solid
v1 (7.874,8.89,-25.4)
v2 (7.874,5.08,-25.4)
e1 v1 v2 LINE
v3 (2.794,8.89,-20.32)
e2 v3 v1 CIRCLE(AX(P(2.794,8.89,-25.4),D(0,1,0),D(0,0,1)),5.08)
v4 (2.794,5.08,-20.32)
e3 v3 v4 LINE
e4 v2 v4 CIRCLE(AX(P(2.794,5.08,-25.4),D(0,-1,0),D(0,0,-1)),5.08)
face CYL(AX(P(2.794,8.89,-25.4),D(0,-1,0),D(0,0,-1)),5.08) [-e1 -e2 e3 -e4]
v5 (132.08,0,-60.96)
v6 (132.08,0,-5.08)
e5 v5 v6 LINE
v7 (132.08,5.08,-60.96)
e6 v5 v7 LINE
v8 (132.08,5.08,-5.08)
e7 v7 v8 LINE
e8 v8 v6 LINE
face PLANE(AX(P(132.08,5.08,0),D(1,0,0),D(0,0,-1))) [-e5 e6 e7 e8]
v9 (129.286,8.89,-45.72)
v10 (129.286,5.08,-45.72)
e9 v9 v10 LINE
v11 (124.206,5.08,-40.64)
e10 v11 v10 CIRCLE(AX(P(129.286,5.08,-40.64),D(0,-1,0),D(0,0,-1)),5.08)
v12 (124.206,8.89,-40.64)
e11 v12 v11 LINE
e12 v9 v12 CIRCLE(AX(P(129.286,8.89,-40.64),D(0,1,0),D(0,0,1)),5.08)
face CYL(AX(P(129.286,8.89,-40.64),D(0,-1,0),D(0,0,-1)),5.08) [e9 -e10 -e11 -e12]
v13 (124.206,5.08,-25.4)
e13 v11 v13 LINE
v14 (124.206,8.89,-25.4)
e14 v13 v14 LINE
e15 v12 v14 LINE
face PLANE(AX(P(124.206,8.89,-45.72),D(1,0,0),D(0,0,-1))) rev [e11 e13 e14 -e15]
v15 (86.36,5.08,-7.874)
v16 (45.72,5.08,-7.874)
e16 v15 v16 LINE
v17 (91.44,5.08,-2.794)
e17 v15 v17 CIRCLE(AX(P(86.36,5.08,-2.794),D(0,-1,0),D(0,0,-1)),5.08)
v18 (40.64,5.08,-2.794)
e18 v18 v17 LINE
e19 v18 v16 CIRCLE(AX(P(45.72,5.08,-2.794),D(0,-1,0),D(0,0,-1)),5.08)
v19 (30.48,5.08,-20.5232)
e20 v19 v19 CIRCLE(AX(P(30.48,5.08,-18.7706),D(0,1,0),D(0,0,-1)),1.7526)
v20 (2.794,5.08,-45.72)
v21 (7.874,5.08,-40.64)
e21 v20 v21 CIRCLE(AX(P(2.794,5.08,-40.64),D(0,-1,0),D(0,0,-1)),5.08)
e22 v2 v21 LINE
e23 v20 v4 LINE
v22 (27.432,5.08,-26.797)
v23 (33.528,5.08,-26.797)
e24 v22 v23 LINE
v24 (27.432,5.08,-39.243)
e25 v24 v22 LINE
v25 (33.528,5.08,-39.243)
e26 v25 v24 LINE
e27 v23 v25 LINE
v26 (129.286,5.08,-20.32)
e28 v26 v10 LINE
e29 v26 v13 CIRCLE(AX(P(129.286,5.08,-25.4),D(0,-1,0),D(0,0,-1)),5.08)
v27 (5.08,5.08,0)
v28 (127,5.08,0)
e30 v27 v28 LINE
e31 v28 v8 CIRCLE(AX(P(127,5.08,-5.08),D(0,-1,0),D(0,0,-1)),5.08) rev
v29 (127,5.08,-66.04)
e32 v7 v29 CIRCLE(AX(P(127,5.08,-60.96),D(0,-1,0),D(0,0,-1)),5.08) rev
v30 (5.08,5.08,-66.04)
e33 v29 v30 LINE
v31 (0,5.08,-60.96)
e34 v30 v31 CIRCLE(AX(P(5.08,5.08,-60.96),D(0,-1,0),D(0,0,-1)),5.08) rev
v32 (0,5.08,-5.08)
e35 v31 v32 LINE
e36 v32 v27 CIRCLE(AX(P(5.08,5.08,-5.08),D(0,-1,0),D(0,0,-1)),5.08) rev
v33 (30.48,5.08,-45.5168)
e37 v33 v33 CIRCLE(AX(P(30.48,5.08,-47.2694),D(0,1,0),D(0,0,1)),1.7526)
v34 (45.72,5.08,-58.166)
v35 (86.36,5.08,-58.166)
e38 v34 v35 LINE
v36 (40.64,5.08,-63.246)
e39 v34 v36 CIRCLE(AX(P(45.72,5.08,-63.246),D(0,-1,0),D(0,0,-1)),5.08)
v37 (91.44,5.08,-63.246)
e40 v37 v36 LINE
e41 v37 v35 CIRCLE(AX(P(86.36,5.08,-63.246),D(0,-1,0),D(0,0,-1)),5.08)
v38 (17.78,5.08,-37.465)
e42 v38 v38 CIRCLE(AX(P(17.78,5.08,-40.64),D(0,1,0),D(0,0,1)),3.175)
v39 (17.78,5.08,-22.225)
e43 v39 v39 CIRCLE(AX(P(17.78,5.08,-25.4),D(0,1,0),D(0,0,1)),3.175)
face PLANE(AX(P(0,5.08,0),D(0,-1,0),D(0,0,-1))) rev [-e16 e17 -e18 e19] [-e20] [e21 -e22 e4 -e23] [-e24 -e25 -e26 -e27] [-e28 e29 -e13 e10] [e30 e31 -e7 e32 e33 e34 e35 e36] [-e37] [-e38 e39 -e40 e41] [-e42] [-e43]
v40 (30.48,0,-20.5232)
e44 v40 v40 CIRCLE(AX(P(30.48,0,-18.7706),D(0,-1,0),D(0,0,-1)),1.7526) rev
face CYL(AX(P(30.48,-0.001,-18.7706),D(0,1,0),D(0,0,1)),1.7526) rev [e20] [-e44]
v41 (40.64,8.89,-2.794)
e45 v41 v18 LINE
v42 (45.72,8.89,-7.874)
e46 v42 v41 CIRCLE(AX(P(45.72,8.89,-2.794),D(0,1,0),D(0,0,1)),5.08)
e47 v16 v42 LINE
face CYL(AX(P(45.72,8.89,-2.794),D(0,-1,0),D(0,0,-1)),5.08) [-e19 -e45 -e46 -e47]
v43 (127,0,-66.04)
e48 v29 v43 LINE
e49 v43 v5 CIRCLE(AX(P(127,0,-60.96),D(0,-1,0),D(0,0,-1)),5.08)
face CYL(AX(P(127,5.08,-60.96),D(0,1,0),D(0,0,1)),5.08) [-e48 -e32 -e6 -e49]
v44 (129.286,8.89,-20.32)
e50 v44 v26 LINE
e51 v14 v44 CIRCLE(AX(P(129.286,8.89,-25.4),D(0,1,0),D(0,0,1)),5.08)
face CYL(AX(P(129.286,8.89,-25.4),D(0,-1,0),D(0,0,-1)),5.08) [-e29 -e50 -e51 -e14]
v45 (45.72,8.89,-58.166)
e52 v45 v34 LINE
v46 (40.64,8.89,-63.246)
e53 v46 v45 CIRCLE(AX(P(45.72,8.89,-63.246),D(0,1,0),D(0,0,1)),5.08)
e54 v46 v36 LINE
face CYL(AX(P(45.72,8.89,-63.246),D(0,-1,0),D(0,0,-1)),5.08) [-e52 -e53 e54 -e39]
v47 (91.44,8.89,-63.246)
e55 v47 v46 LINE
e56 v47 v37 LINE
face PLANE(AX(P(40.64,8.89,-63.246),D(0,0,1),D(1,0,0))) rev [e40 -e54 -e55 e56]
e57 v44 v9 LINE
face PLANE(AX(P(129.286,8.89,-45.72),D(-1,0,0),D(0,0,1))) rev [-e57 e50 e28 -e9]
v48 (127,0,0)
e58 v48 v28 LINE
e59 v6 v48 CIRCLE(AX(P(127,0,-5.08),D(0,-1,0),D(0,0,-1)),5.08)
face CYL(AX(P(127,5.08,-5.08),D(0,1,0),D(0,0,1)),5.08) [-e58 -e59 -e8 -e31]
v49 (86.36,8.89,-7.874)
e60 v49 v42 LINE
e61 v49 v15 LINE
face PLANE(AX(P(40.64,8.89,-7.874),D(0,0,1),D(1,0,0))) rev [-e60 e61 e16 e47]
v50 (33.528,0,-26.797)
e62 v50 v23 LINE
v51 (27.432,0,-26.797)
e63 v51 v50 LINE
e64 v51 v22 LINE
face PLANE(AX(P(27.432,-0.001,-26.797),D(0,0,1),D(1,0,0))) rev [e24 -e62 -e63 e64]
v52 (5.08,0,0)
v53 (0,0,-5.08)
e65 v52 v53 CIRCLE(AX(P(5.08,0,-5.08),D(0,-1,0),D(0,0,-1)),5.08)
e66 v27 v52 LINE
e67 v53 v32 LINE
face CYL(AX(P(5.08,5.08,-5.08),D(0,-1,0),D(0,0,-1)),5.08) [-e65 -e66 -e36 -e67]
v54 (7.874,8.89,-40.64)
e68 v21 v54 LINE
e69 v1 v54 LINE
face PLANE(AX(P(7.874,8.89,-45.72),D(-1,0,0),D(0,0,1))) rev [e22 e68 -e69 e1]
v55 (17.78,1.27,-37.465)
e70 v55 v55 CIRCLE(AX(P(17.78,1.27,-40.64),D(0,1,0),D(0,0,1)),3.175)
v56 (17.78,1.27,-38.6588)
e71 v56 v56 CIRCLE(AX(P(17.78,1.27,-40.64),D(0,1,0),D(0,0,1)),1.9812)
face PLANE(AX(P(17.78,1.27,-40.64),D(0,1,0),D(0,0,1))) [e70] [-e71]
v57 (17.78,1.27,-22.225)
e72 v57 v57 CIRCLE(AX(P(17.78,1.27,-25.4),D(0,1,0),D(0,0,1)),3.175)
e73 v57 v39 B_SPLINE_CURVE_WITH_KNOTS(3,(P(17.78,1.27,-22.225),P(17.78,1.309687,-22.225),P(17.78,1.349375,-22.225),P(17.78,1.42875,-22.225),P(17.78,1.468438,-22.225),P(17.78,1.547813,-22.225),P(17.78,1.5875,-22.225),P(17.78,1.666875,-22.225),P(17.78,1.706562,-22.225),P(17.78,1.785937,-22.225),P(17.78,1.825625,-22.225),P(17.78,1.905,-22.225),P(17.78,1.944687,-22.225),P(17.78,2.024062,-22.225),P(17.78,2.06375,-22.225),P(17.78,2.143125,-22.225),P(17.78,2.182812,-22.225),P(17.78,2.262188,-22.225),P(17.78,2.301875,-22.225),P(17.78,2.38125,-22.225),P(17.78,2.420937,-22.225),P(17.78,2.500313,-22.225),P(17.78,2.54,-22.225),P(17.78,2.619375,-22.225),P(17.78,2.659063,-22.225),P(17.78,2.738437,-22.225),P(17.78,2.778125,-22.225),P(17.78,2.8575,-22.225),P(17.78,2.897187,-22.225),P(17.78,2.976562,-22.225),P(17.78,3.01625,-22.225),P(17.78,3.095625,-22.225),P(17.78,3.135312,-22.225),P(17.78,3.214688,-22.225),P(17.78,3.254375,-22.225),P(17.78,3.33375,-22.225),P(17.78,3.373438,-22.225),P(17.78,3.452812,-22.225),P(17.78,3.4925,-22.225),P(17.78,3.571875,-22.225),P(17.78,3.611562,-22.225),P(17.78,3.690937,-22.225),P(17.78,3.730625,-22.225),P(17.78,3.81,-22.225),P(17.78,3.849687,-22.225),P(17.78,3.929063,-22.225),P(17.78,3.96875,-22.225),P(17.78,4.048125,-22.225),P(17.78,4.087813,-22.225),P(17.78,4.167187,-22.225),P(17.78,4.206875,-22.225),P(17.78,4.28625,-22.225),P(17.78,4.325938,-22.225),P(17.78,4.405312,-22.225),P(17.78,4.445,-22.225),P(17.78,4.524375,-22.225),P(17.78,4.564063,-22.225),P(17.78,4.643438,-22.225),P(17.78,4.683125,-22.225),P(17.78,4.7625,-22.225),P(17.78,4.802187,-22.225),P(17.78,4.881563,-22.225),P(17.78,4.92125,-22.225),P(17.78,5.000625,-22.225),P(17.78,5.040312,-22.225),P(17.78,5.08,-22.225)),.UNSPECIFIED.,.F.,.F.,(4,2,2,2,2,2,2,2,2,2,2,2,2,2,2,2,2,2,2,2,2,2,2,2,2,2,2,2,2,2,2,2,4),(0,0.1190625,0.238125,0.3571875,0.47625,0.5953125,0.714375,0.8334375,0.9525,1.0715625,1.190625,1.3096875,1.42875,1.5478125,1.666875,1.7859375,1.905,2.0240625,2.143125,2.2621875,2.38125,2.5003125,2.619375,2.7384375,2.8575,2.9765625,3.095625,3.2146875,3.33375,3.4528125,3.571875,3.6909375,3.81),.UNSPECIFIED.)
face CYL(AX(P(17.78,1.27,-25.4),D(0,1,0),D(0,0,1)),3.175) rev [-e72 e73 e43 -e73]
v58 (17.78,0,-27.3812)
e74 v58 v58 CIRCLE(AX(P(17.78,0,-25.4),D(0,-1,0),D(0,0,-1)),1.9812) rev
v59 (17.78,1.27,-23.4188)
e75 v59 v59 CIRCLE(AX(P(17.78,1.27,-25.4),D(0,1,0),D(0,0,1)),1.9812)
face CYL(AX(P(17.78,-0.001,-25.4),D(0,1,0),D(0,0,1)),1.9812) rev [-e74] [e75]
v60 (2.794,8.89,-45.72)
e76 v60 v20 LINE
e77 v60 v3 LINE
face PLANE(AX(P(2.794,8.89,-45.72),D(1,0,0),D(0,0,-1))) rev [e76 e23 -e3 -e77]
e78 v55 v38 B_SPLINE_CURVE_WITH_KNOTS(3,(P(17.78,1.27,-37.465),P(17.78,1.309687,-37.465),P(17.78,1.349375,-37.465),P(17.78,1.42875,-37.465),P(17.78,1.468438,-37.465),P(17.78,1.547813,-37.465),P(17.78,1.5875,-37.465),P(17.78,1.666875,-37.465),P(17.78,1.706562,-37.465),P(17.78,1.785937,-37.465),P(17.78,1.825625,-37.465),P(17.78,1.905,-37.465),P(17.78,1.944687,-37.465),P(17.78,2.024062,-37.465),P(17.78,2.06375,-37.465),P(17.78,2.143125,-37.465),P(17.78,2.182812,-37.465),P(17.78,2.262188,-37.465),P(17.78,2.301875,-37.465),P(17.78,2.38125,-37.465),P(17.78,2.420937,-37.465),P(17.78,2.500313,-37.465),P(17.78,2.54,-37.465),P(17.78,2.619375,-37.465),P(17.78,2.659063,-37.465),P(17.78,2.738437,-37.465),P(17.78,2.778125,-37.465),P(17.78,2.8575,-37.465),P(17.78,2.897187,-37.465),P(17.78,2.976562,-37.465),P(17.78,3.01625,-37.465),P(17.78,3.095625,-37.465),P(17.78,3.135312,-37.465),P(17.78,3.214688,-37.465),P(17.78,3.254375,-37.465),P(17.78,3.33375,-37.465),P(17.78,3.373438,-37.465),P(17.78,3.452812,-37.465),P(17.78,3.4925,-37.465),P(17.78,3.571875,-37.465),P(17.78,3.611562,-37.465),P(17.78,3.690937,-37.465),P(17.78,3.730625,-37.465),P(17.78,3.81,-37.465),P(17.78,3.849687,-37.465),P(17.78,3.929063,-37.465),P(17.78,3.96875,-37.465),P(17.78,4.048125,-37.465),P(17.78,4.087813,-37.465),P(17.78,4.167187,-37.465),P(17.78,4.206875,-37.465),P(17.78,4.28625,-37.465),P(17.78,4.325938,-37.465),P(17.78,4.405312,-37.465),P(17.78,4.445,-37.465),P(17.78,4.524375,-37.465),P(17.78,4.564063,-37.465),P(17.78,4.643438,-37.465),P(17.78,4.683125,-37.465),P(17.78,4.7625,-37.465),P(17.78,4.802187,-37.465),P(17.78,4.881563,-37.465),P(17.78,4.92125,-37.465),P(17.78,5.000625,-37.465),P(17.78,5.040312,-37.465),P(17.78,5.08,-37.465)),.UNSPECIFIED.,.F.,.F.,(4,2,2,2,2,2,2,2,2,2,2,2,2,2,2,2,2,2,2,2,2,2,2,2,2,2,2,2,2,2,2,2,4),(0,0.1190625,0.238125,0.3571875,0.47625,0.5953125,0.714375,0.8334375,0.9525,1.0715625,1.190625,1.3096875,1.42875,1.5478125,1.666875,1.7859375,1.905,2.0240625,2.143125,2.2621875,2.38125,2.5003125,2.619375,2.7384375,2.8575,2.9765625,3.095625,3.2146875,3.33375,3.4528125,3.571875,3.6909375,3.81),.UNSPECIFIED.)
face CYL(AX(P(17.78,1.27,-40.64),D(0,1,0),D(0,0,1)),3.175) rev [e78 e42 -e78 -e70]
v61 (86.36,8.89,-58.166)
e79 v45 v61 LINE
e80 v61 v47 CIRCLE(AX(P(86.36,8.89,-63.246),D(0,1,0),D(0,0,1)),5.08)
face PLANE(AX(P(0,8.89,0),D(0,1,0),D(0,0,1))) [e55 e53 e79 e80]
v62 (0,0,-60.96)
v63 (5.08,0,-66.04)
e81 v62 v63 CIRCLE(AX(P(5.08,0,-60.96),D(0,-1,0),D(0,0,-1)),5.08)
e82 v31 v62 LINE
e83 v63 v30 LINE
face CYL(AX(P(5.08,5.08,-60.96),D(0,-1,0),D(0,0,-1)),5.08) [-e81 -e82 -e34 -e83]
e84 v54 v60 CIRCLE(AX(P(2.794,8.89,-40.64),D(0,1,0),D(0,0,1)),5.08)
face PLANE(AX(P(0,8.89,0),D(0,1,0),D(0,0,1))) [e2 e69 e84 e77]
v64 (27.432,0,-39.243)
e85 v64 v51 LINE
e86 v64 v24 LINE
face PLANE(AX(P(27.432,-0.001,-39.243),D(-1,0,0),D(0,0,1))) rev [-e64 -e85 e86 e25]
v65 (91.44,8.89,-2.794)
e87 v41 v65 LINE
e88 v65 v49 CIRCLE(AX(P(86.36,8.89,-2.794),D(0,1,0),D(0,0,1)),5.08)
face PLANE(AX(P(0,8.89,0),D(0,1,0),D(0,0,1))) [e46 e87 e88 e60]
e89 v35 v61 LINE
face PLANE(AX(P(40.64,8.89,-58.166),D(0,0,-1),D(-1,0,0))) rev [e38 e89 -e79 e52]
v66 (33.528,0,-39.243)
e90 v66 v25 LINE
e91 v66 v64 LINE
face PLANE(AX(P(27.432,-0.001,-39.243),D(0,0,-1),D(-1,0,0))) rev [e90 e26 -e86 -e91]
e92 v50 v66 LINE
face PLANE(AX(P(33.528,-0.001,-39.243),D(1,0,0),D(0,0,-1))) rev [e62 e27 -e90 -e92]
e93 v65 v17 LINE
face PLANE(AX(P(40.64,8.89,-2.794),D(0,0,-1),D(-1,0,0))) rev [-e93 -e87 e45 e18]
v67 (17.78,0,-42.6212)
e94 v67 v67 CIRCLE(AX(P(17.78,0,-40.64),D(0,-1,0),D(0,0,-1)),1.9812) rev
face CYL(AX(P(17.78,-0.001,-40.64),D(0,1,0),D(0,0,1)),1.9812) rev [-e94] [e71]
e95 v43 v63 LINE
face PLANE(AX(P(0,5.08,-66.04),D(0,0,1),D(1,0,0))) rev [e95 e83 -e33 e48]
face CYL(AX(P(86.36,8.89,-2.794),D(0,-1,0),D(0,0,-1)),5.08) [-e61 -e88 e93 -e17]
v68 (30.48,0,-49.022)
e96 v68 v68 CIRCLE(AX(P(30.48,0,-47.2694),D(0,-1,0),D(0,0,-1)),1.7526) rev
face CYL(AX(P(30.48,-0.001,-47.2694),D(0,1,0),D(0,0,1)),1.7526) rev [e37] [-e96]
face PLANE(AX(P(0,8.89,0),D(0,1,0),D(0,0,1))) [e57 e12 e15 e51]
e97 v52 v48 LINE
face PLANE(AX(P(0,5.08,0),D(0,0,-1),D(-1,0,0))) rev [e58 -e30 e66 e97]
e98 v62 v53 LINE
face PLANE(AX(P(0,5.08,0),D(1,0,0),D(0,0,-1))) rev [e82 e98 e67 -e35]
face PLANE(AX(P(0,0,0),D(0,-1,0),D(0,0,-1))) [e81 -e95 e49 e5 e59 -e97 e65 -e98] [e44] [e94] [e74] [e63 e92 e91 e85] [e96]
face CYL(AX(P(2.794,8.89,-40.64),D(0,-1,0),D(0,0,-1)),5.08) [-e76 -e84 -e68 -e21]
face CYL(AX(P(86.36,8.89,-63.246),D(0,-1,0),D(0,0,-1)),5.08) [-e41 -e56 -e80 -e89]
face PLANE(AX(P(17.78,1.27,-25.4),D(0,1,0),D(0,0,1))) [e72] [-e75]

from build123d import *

# Parameters (mm, degrees)
SKETCH1_W           = 121.92
SKETCH1_H           = 66.04
BOSS_EXTRUDE1_DEPTH = 5.08
FILLET1_R           = 5.08
CUT_EXTRUDE2_REACH  = 140.75
SKETCH2_R           = 1.7526
SKETCH2_W           = 6.096
SKETCH2_H           = 12.446
SKETCH3_R           = 3.175
CUT_EXTRUDE3_DEPTH  = 3.81
CUT_EXTRUDE4_REACH  = 140.709
SKETCH4_R           = 1.9812
SKETCH8_W           = 15.24
SKETCH8_H           = 66.04
BOSS_EXTRUDE2_DEPTH = 5.08
FILLET4_R           = 5.08
SKETCH10_W          = 5.08
SKETCH10_H          = 25.4
BOSS_EXTRUDE4_DEPTH = 3.81
SKETCH11_W          = 50.8
SKETCH11_H          = 5.08
BOSS_EXTRUDE5_DEPTH = 3.81
FILLET5_R           = 5.08


with BuildPart() as part:
    # Sketch1 → Boss-Extrude1 (new body)
    with BuildSketch(Plane(origin=(0, 0, 0), x_dir=(1, 0, 0), z_dir=(0, 1, 0))):
        with Locations((60.96, 33.02)):
            Rectangle(SKETCH1_W, SKETCH1_H)
    extrude(amount=BOSS_EXTRUDE1_DEPTH)

    # Fillet1
    fillet1_edges = [part.edges().sort_by_distance(p)[0] for p in [
        (0, 2.54, -66.04),
        (121.92, 2.54, -66.04),
        (121.92, 2.54, 0),
        (0, 2.54, 0),
    ]]
    fillet(fillet1_edges, radius=FILLET1_R)

    # Sketch2 → Cut-Extrude2 (cut, up to next)
    with BuildSketch(Plane(origin=(0, 5.08, 0), x_dir=(1, 0, 0), z_dir=(0, 1, 0)), mode=Mode.PRIVATE) as cut_extrude2_sk1:
        with Locations(Location((30.48, 47.2694, 0), (0, 0, 270))):
            Circle(SKETCH2_R)
    cut_extrude2_tool1 = extrude(cut_extrude2_sk1.sketch, amount=-CUT_EXTRUDE2_REACH, mode=Mode.PRIVATE) & part.part
    # Sketch2 → Cut-Extrude2 (cut, up to next)
    with BuildSketch(Plane(origin=(0, 5.08, 0), x_dir=(1, 0, 0), z_dir=(0, 1, 0)), mode=Mode.PRIVATE) as cut_extrude2_sk2:
        with Locations(Location((30.48, 18.7706, 0), (0, 0, 90))):
            Circle(SKETCH2_R)
    cut_extrude2_tool2 = extrude(cut_extrude2_sk2.sketch, amount=-CUT_EXTRUDE2_REACH, mode=Mode.PRIVATE) & part.part
    # Sketch2 → Cut-Extrude2 (cut, up to next)
    with BuildSketch(Plane(origin=(0, 5.08, 0), x_dir=(1, 0, 0), z_dir=(0, 1, 0)), mode=Mode.PRIVATE) as cut_extrude2_sk3:
        with Locations((30.48, 33.02)):
            Rectangle(SKETCH2_W, SKETCH2_H)
    cut_extrude2_tool3 = extrude(cut_extrude2_sk3.sketch, amount=-CUT_EXTRUDE2_REACH, mode=Mode.PRIVATE) & part.part
    add(cut_extrude2_tool1.solids().sort_by_distance((30.48, 5.08, -47.2694))[0], mode=Mode.SUBTRACT)
    add(cut_extrude2_tool2.solids().sort_by_distance((30.48, 5.08, -18.7706))[0], mode=Mode.SUBTRACT)
    add(cut_extrude2_tool3.solids().sort_by_distance((30.48, 5.08, -33.02))[0], mode=Mode.SUBTRACT)

    # Sketch3 → Cut-Extrude3 (cut)
    with BuildSketch(Plane(origin=(0, 5.08, 0), x_dir=(1, 0, 0), z_dir=(0, 1, 0))):
        with Locations(Location((17.78, 40.64, 0), (0, 0, 270))):
            Circle(SKETCH3_R)
        with Locations(Location((17.78, 25.4, 0), (0, 0, 270))):
            Circle(SKETCH3_R)
    extrude(amount=-CUT_EXTRUDE3_DEPTH, mode=Mode.SUBTRACT)

    # Sketch4 → Cut-Extrude4 (cut, up to next)
    with BuildSketch(Plane(origin=(0, 1.27, 0), x_dir=(1, 0, 0), z_dir=(0, 1, 0)), mode=Mode.PRIVATE) as cut_extrude4_sk1:
        with Locations(Location((17.78, 40.64, 0), (0, 0, 270))):
            Circle(SKETCH4_R)
    cut_extrude4_tool1 = extrude(cut_extrude4_sk1.sketch, amount=-CUT_EXTRUDE4_REACH, mode=Mode.PRIVATE) & part.part
    # Sketch4 → Cut-Extrude4 (cut, up to next)
    with BuildSketch(Plane(origin=(0, 1.27, 0), x_dir=(1, 0, 0), z_dir=(0, 1, 0)), mode=Mode.PRIVATE) as cut_extrude4_sk2:
        with Locations(Location((17.78, 25.4, 0), (0, 0, 270))):
            Circle(SKETCH4_R)
    cut_extrude4_tool2 = extrude(cut_extrude4_sk2.sketch, amount=-CUT_EXTRUDE4_REACH, mode=Mode.PRIVATE) & part.part
    add(cut_extrude4_tool1.solids().sort_by_distance((17.78, 1.27, -40.64))[0], mode=Mode.SUBTRACT)
    add(cut_extrude4_tool2.solids().sort_by_distance((17.78, 1.27, -25.4))[0], mode=Mode.SUBTRACT)

    # Sketch8 → Boss-Extrude2 (add)
    with BuildSketch(Plane.XZ):
        with Locations((124.46, -33.02)):
            Rectangle(SKETCH8_W, SKETCH8_H)
    extrude(amount=-BOSS_EXTRUDE2_DEPTH)

    # Fillet4
    fillet4_edges = [part.edges().sort_by_distance(p)[0] for p in [
        (132.08, 2.54, 0),
        (132.08, 2.54, -66.04),
    ]]
    fillet(fillet4_edges, radius=FILLET4_R)

    # Sketch10 → Boss-Extrude4 (add)
    with BuildSketch(Plane(origin=(0, 5.08, 0), x_dir=(1, 0, 0), z_dir=(0, 1, 0))):
        with Locations((5.334, 33.02)):
            Rectangle(SKETCH10_W, SKETCH10_H)
        with Locations((126.746, 33.02)):
            Rectangle(SKETCH10_W, SKETCH10_H)
    extrude(amount=BOSS_EXTRUDE4_DEPTH)

    # Sketch11 → Boss-Extrude5 (add)
    with BuildSketch(Plane(origin=(0, 5.08, 0), x_dir=(1, 0, 0), z_dir=(0, 1, 0))):
        with Locations((66.04, 60.706)):
            Rectangle(SKETCH11_W, SKETCH11_H)
        with Locations((66.04, 5.334)):
            Rectangle(SKETCH11_W, SKETCH11_H)
    extrude(amount=BOSS_EXTRUDE5_DEPTH)

    # Fillet5
    fillet5_edges = [part.edges().sort_by_distance(p)[0] for p in [
        (40.64, 6.985, -7.874),
        (91.44, 6.985, -7.874),
        (124.206, 6.985, -20.32),
        (124.206, 6.985, -45.72),
        (91.44, 6.985, -58.166),
        (40.64, 6.985, -58.166),
        (7.874, 6.985, -20.32),
        (7.874, 6.985, -45.72),
    ]]
    fillet(fillet5_edges, radius=FILLET5_R - 0.0001)  # a hair under: the kernel refuses the full size


solid = part.part
